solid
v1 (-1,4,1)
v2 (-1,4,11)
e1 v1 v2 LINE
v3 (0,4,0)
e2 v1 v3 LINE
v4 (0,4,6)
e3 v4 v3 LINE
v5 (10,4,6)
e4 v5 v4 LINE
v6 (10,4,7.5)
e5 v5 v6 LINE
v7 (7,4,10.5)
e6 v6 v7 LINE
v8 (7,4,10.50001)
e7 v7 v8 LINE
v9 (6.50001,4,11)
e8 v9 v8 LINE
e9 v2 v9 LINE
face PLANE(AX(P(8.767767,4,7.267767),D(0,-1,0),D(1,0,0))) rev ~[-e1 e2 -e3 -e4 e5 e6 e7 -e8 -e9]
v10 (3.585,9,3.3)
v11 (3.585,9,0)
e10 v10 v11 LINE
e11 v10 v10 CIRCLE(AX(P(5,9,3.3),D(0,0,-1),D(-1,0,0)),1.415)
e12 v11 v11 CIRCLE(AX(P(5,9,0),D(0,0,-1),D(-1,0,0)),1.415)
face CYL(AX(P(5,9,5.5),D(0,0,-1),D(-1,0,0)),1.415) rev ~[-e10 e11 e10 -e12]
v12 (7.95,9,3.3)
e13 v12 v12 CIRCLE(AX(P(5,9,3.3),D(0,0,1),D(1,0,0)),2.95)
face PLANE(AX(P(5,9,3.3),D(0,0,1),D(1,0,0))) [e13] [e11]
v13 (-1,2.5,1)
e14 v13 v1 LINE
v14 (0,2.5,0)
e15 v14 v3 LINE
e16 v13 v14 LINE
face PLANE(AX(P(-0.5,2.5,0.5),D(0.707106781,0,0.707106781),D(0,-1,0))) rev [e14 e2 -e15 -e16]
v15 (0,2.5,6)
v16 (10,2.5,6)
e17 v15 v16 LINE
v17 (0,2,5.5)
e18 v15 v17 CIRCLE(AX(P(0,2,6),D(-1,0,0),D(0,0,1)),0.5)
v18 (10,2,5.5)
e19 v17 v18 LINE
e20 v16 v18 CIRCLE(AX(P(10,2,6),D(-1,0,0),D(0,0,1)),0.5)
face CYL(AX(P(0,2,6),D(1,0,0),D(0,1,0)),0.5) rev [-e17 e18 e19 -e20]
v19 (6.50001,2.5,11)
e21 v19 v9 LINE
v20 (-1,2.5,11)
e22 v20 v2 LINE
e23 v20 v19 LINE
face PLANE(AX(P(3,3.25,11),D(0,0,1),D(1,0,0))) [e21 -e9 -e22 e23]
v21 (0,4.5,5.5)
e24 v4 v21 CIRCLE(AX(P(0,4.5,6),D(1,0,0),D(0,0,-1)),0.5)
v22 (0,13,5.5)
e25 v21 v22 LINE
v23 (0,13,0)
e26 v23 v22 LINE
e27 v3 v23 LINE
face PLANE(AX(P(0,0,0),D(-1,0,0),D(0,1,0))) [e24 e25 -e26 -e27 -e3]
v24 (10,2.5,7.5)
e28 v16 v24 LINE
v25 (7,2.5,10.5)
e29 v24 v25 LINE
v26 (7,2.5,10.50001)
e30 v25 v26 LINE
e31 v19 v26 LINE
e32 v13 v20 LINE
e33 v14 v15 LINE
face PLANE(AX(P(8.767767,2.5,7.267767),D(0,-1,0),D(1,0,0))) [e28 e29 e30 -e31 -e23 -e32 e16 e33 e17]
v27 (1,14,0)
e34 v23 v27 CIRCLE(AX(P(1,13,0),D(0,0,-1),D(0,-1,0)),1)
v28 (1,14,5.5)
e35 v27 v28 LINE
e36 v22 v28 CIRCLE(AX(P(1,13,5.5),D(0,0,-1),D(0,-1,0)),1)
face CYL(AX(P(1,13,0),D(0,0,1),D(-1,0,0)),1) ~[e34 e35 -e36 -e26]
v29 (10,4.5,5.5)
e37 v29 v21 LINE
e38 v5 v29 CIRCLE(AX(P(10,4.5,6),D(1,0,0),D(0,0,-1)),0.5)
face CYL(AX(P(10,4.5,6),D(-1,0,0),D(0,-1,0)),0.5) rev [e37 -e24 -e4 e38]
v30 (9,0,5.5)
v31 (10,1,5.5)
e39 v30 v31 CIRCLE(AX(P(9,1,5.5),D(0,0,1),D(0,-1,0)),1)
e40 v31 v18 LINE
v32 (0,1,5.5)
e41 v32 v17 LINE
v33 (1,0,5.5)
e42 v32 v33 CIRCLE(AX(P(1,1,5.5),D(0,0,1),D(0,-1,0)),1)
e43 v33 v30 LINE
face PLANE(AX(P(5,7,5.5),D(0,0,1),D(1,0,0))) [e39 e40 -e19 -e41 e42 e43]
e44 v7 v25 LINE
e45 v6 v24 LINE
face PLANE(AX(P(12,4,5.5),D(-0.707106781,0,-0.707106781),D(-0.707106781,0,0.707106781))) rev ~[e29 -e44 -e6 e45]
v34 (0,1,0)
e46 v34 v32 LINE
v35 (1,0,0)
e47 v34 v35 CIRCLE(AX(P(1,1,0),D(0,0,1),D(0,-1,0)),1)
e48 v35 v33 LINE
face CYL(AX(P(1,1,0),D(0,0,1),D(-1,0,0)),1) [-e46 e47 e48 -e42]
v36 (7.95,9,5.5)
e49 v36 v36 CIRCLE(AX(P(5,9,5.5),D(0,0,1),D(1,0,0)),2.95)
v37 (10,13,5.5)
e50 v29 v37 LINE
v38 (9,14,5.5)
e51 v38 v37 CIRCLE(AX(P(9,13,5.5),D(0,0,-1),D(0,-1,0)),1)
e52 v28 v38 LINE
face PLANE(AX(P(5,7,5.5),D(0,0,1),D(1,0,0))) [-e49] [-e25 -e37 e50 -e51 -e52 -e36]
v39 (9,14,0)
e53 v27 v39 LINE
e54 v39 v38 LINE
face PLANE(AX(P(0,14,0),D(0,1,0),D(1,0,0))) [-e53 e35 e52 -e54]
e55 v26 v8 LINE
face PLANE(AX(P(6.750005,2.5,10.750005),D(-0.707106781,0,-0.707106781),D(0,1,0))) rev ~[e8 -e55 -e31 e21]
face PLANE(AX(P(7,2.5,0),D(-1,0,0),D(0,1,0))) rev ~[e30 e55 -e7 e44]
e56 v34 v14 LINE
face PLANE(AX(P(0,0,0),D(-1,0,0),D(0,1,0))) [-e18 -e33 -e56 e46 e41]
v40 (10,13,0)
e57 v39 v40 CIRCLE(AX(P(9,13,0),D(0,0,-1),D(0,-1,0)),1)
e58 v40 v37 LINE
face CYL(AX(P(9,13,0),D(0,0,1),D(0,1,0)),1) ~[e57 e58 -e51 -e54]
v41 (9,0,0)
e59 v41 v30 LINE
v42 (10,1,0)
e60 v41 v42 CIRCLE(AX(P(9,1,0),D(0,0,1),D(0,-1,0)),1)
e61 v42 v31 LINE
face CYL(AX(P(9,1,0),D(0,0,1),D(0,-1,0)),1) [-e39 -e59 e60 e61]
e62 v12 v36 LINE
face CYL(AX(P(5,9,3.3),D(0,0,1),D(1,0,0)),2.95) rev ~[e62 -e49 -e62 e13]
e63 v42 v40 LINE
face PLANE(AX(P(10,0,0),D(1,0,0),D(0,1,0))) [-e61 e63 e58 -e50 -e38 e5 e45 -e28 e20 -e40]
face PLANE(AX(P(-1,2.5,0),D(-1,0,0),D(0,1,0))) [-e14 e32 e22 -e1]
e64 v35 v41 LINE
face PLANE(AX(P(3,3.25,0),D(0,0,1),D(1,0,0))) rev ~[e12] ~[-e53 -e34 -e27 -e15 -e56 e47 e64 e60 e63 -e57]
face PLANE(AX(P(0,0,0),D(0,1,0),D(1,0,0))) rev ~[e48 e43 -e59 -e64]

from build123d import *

# Parameters (mm, degrees)
F0_W           = 10
F0_H           = 14
F1_DEPTH       = 5.5
F4_D           = 2.83
F4_CBORE_D     = 5.9
F4_CBORE_DEPTH = 2.2
F2_W           = 8
F2_H           = 1.5
F5_DEPTH       = 11
F6_SIZE        = 1
F7_R           = 1
F8_T4_DEPTH    = 1.5
F9_SIZE        = 0.49999
F10_R          = 0.5


# Not quite as in the source:
# - a fillet or chamfer that OpenCascade refuses, or shapes differently, is made with other operations: its cross-section is extruded or revolved along the edge and cut away or added
# - a fillet or chamfer is up to 0.001 mm smaller than in the source, because OpenCascade refuses the exact size


with BuildPart() as f1:
    # F0 (on Top) → F1 (new body)
    with BuildSketch(Plane.XY):
        with Locations((5, 7)):
            Rectangle(F0_W, F0_H)
    extrude(amount=F1_DEPTH)

    # F4 (through all)
    with Locations(Plane.XY.offset(5.5)):
        with Locations((5, 9)):
            CounterBoreHole(F4_D / 2, F4_CBORE_D / 2, F4_CBORE_DEPTH)

    # F2 (on Top) → F5 (join)
    with BuildSketch(Plane.XY):
        with Locations((3, 3.25)):
            Rectangle(F2_W, F2_H)
    extrude(amount=F5_DEPTH)

    # F6
    f6_edges = [f1.edges().sort_by_distance(p)[0] for p in [
        (-1, 3.25, 0),
    ]]
    chamfer(f6_edges, length=F6_SIZE)

    # F7
    f7_edges = [f1.edges().sort_by_distance(p)[0] for p in [
        (0, 14, 2.75),
        (10, 14, 2.75),
        (10, 0, 2.75),
        (0, 0, 2.75),
    ]]
    fillet(f7_edges, radius=F7_R)

    # F8: chamfer of 5 on 1 edges, made by hand


with BuildPart() as f8_tool2:
    # F8_s3 → F8_t4 (new body)
    with BuildSketch(Plane.XZ.offset(-4)):
        Polygon((12, 5.5), (7, 10.5), (7, 5.5), align=None)
    extrude(amount=F8_T4_DEPTH)

    split(bisect_by=Plane.YZ.offset(10), keep=Keep.BOTTOM)


with BuildPart() as f1_1:
    add(f1.part)

    # F8_t1: union F8_tool2
    add(f8_tool2.part)

    # F9 (size 0.5 in the source; OpenCascade refuses exactly that, so slightly less here)
    f9_edges = [f1_1.edges().sort_by_distance(p)[0] for p in [
        (7, 3.25, 11),
    ]]
    chamfer(f9_edges, length=F9_SIZE)

    # F10
    f10_edges = [f1_1.edges().sort_by_distance(p)[0] for p in [
        (5, 4, 5.5),
        (5, 2.5, 5.5),
    ]]
    fillet(f10_edges, radius=F10_R)


solid = f1_1.part
